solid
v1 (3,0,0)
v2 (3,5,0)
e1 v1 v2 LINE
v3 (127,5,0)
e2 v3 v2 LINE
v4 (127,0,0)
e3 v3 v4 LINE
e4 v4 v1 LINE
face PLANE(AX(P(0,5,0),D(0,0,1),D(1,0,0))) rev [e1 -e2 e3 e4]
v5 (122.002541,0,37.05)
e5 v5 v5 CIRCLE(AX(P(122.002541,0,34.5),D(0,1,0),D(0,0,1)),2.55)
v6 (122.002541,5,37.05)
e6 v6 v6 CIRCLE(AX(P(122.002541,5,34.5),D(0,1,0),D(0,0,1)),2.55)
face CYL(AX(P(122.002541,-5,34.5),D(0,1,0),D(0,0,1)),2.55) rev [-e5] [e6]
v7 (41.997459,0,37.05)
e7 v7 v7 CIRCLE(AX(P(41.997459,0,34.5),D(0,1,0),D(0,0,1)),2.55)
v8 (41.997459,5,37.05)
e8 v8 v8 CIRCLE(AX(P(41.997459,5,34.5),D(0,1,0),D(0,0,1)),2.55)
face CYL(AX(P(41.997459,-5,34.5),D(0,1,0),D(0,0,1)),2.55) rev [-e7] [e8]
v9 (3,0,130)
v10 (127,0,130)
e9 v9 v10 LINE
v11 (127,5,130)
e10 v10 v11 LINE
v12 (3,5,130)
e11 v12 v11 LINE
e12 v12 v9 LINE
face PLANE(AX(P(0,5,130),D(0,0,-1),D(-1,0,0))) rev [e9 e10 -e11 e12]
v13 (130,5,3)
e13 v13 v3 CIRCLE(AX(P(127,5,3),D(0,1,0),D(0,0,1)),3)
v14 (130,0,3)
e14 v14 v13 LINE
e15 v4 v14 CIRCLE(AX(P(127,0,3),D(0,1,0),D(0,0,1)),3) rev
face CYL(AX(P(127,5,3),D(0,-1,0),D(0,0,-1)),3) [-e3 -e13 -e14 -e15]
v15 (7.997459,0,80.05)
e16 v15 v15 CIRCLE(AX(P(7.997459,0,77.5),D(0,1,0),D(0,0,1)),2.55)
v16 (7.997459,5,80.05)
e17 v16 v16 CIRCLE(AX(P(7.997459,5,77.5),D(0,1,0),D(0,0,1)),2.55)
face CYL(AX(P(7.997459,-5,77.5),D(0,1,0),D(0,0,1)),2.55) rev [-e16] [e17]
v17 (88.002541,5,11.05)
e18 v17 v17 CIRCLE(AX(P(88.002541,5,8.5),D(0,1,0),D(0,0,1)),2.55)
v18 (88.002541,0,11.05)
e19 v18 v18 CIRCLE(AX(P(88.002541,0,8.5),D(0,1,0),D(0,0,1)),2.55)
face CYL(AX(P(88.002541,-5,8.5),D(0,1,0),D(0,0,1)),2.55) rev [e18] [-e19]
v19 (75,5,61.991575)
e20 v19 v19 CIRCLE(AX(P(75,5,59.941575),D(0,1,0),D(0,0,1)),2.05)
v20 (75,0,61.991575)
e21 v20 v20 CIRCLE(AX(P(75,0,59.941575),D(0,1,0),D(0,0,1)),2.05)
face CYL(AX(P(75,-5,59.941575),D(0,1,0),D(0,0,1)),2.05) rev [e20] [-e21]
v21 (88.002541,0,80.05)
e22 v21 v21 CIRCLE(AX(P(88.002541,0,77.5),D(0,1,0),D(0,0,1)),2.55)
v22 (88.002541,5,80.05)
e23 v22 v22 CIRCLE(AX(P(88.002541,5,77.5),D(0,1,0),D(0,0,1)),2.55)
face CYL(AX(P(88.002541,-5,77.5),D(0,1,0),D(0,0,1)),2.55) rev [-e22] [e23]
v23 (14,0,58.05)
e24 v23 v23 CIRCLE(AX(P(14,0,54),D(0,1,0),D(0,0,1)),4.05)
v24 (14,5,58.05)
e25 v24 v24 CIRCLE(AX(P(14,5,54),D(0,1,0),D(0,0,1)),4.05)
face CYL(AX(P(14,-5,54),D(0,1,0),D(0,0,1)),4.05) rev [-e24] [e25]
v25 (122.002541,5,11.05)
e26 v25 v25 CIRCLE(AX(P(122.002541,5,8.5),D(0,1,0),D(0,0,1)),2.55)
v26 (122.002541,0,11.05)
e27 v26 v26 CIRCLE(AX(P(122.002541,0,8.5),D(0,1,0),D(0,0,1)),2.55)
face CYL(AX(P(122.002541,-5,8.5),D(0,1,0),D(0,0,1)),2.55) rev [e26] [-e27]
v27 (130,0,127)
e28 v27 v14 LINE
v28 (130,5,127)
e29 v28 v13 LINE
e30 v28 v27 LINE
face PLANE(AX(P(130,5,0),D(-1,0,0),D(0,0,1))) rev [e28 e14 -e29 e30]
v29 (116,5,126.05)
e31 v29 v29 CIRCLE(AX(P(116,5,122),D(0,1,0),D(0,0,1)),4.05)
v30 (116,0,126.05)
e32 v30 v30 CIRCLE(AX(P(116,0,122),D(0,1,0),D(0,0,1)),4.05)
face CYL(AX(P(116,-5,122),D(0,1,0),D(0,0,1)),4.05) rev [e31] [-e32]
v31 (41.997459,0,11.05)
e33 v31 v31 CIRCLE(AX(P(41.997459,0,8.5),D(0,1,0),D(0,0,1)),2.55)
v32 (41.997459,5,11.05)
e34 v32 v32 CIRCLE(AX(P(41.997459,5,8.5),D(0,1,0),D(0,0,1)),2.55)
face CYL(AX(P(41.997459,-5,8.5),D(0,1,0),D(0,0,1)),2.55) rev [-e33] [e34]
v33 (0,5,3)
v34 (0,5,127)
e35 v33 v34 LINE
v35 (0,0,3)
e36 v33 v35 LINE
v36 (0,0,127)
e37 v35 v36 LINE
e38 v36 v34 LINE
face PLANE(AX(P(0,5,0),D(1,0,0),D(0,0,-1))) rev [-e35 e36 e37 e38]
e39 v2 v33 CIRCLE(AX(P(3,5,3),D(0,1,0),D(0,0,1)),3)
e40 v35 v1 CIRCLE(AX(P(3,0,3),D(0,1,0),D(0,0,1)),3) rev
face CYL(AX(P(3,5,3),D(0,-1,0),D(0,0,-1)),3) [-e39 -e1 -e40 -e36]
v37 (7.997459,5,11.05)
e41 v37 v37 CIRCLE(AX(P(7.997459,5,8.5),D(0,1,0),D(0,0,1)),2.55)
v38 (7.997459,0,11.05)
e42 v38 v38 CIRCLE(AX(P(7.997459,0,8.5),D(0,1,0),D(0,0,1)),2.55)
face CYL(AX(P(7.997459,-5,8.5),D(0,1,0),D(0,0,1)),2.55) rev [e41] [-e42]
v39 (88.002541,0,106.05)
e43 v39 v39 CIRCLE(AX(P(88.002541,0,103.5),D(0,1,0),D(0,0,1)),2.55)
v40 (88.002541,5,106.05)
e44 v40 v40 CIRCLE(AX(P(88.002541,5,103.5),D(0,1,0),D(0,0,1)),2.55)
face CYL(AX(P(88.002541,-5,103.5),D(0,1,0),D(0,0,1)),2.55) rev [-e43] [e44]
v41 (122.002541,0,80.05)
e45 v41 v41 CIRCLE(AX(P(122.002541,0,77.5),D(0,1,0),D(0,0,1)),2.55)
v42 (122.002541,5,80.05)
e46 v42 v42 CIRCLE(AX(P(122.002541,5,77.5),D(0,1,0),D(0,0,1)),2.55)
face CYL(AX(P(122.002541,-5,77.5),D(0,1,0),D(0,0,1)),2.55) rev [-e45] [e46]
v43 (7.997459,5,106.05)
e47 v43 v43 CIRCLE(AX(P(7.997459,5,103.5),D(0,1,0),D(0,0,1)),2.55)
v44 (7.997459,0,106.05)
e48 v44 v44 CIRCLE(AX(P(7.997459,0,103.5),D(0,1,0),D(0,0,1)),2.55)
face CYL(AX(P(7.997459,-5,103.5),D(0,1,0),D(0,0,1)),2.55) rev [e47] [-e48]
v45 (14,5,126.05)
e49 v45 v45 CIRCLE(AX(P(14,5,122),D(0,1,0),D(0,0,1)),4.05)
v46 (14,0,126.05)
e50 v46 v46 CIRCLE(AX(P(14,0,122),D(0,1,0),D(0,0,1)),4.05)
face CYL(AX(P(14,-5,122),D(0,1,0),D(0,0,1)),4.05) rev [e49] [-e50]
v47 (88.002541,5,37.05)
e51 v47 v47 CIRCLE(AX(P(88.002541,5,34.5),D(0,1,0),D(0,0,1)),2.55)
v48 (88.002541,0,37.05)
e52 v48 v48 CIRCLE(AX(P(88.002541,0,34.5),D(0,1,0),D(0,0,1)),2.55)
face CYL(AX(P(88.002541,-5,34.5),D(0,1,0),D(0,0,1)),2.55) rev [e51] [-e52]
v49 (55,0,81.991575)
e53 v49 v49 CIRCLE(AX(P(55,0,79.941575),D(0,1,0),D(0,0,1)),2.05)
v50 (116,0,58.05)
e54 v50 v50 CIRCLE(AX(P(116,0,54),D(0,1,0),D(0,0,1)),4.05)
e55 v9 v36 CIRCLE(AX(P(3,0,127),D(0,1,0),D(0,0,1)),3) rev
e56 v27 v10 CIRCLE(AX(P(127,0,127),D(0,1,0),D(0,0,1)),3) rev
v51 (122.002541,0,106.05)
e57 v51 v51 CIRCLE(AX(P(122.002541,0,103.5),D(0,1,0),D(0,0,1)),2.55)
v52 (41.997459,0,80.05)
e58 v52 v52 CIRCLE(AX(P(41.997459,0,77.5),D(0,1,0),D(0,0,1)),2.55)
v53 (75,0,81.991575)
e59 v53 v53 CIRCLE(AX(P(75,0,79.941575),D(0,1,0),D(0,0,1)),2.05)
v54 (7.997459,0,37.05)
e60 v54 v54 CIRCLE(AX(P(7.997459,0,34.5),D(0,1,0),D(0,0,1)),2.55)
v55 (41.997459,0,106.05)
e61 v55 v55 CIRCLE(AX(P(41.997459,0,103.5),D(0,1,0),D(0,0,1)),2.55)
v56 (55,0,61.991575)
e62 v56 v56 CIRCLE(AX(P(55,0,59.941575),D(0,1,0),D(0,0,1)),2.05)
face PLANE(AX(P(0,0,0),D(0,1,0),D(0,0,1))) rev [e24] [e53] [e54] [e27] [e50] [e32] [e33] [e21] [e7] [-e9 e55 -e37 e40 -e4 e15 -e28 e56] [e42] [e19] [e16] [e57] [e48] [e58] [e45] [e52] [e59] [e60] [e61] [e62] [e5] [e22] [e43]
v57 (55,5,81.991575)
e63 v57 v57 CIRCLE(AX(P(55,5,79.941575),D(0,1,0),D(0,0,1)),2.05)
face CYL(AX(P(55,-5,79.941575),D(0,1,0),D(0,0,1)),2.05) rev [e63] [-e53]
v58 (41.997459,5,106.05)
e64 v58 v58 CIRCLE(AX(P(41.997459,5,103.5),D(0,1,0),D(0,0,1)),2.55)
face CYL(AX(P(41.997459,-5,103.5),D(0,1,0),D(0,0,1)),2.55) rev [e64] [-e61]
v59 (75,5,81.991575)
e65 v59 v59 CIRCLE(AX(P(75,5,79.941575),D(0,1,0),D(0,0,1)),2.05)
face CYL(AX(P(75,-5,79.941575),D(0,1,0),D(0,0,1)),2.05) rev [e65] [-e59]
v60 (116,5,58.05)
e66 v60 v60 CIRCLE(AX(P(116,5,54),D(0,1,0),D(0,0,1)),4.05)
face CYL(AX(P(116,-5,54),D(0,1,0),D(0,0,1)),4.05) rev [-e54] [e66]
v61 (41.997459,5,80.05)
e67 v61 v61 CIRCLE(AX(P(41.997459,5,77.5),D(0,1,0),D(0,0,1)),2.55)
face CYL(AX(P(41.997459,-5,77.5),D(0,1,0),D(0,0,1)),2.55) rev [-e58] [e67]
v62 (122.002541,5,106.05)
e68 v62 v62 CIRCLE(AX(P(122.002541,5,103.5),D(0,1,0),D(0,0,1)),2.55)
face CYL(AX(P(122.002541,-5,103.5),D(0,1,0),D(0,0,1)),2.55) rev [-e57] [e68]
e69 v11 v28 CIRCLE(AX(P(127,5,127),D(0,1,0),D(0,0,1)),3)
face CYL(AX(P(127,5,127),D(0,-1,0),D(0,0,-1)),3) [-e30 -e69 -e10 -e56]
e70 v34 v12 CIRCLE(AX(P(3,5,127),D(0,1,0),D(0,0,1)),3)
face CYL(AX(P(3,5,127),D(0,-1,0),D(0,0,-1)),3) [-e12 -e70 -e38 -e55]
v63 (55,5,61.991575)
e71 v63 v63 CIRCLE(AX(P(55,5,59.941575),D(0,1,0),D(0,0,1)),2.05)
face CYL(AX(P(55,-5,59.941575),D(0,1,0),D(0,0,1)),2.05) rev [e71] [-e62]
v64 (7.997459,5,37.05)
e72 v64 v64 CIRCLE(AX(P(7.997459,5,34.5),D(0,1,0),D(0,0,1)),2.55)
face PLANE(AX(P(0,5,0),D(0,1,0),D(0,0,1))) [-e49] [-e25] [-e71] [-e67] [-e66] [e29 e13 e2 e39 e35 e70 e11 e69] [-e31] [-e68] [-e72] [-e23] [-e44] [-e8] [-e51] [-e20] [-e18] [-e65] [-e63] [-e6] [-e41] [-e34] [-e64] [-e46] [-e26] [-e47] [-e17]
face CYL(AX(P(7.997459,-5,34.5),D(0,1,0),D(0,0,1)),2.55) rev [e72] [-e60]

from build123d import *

# Parameters (mm, degrees)
SKETCH1_W           = 130
SKETCH1_H           = 130
BOSS_EXTRUDE1_DEPTH = 5
SKETCH2_R           = 4.05
CUT_EXTRUDE1_DEPTH  = 10
FILLET1_START       = -1
FILLET1_OUTLINE_R   = 2.55
FILLET1_OUTLINE_R_2 = 2.05
FILLET1_DEPTH       = 7


with BuildPart() as part:
    # Sketch1 → Boss-Extrude1 (new body)
    with BuildSketch(Plane(origin=(0, 0, 0), x_dir=(1, 0, 0), z_dir=(0, 1, 0))):
        with Locations((65, -65)):
            Rectangle(SKETCH1_W, SKETCH1_H)
    extrude(amount=BOSS_EXTRUDE1_DEPTH)

    # Sketch2 → Cut-Extrude1 (cut)
    with BuildSketch(Plane(origin=(0, 5, 0), x_dir=(1, 0, 0), z_dir=(0, 1, 0))):
        with Locations(Location((14, -54, 0), (0, 0, 270))):
            Circle(SKETCH2_R)
        with Locations(Location((116, -54, 0), (0, 0, 270))):
            Circle(SKETCH2_R)
        with Locations(Location((116, -122, 0), (0, 0, 270))):
            Circle(SKETCH2_R)
        with Locations(Location((14, -122, 0), (0, 0, 270))):
            Circle(SKETCH2_R)
    extrude(amount=-CUT_EXTRUDE1_DEPTH, mode=Mode.SUBTRACT)

    # Fillet1: read off the stored shape, not the designer's step
    # Fillet1 outline → Fillet1 (cut)
    with BuildSketch(Plane(origin=(0, 0, 0), x_dir=(1, 0, 0), z_dir=(0, 1, 0)).offset(FILLET1_START)):
        with Locations((41.997459274, -8.5)):
            Circle(FILLET1_OUTLINE_R)
        with Locations((41.997459274, -77.5)):
            Circle(FILLET1_OUTLINE_R)
        with Locations((41.997459274, -103.5)):
            Circle(FILLET1_OUTLINE_R)
        with Locations((7.997459274, -103.5)):
            Circle(FILLET1_OUTLINE_R)
        with Locations((88.002540726, -77.5)):
            Circle(FILLET1_OUTLINE_R)
        with Locations((88.002540726, -103.5)):
            Circle(FILLET1_OUTLINE_R)
        with Locations((41.997459274, -34.5)):
            Circle(FILLET1_OUTLINE_R)
        with Locations((7.997459274, -8.5)):
            Circle(FILLET1_OUTLINE_R)
        with Locations((7.997459274, -34.5)):
            Circle(FILLET1_OUTLINE_R)
        with Locations((7.997459274, -77.5)):
            Circle(FILLET1_OUTLINE_R)
        with Locations((88.002540726, -8.5)):
            Circle(FILLET1_OUTLINE_R)
        with Locations((55, -59.941575486)):
            Circle(FILLET1_OUTLINE_R_2)
        with Locations((75, -59.941575486)):
            Circle(FILLET1_OUTLINE_R_2)
        with Locations((75, -79.941575486)):
            Circle(FILLET1_OUTLINE_R_2)
        with Locations((55, -79.941575486)):
            Circle(FILLET1_OUTLINE_R_2)
        with Locations((88.002540726, -34.5)):
            Circle(FILLET1_OUTLINE_R)
        with Locations((122.002540726, -34.5)):
            Circle(FILLET1_OUTLINE_R)
        with Locations((122.002540726, -8.5)):
            Circle(FILLET1_OUTLINE_R)
        with Locations((122.002540726, -77.5)):
            Circle(FILLET1_OUTLINE_R)
        with Locations((122.002540726, -103.5)):
            Circle(FILLET1_OUTLINE_R)
        with BuildLine():
            Line((130, -130), (130, -127))
            ThreePointArc((130, -127), (129.121320344, -129.121320344), (127, -130))
            Line((127, -130), (130, -130))
        make_face()
        with BuildLine():
            ThreePointArc((127, 0), (129.121320344, -0.878679656), (130, -3))
            Line((130, -3), (130, 0))
            Line((130, 0), (127, 0))
        make_face()
        with BuildLine():
            Line((0, -130), (3, -130))
            ThreePointArc((3, -130), (0.878679656, -129.121320344), (0, -127))
            Line((0, -127), (0, -130))
        make_face()
        with BuildLine():
            ThreePointArc((0, -3), (0.878679656, -0.878679656), (3, 0))
            Line((3, 0), (0, 0))
            Line((0, 0), (0, -3))
        make_face()
    extrude(amount=FILLET1_DEPTH, mode=Mode.SUBTRACT)


solid = part.part
